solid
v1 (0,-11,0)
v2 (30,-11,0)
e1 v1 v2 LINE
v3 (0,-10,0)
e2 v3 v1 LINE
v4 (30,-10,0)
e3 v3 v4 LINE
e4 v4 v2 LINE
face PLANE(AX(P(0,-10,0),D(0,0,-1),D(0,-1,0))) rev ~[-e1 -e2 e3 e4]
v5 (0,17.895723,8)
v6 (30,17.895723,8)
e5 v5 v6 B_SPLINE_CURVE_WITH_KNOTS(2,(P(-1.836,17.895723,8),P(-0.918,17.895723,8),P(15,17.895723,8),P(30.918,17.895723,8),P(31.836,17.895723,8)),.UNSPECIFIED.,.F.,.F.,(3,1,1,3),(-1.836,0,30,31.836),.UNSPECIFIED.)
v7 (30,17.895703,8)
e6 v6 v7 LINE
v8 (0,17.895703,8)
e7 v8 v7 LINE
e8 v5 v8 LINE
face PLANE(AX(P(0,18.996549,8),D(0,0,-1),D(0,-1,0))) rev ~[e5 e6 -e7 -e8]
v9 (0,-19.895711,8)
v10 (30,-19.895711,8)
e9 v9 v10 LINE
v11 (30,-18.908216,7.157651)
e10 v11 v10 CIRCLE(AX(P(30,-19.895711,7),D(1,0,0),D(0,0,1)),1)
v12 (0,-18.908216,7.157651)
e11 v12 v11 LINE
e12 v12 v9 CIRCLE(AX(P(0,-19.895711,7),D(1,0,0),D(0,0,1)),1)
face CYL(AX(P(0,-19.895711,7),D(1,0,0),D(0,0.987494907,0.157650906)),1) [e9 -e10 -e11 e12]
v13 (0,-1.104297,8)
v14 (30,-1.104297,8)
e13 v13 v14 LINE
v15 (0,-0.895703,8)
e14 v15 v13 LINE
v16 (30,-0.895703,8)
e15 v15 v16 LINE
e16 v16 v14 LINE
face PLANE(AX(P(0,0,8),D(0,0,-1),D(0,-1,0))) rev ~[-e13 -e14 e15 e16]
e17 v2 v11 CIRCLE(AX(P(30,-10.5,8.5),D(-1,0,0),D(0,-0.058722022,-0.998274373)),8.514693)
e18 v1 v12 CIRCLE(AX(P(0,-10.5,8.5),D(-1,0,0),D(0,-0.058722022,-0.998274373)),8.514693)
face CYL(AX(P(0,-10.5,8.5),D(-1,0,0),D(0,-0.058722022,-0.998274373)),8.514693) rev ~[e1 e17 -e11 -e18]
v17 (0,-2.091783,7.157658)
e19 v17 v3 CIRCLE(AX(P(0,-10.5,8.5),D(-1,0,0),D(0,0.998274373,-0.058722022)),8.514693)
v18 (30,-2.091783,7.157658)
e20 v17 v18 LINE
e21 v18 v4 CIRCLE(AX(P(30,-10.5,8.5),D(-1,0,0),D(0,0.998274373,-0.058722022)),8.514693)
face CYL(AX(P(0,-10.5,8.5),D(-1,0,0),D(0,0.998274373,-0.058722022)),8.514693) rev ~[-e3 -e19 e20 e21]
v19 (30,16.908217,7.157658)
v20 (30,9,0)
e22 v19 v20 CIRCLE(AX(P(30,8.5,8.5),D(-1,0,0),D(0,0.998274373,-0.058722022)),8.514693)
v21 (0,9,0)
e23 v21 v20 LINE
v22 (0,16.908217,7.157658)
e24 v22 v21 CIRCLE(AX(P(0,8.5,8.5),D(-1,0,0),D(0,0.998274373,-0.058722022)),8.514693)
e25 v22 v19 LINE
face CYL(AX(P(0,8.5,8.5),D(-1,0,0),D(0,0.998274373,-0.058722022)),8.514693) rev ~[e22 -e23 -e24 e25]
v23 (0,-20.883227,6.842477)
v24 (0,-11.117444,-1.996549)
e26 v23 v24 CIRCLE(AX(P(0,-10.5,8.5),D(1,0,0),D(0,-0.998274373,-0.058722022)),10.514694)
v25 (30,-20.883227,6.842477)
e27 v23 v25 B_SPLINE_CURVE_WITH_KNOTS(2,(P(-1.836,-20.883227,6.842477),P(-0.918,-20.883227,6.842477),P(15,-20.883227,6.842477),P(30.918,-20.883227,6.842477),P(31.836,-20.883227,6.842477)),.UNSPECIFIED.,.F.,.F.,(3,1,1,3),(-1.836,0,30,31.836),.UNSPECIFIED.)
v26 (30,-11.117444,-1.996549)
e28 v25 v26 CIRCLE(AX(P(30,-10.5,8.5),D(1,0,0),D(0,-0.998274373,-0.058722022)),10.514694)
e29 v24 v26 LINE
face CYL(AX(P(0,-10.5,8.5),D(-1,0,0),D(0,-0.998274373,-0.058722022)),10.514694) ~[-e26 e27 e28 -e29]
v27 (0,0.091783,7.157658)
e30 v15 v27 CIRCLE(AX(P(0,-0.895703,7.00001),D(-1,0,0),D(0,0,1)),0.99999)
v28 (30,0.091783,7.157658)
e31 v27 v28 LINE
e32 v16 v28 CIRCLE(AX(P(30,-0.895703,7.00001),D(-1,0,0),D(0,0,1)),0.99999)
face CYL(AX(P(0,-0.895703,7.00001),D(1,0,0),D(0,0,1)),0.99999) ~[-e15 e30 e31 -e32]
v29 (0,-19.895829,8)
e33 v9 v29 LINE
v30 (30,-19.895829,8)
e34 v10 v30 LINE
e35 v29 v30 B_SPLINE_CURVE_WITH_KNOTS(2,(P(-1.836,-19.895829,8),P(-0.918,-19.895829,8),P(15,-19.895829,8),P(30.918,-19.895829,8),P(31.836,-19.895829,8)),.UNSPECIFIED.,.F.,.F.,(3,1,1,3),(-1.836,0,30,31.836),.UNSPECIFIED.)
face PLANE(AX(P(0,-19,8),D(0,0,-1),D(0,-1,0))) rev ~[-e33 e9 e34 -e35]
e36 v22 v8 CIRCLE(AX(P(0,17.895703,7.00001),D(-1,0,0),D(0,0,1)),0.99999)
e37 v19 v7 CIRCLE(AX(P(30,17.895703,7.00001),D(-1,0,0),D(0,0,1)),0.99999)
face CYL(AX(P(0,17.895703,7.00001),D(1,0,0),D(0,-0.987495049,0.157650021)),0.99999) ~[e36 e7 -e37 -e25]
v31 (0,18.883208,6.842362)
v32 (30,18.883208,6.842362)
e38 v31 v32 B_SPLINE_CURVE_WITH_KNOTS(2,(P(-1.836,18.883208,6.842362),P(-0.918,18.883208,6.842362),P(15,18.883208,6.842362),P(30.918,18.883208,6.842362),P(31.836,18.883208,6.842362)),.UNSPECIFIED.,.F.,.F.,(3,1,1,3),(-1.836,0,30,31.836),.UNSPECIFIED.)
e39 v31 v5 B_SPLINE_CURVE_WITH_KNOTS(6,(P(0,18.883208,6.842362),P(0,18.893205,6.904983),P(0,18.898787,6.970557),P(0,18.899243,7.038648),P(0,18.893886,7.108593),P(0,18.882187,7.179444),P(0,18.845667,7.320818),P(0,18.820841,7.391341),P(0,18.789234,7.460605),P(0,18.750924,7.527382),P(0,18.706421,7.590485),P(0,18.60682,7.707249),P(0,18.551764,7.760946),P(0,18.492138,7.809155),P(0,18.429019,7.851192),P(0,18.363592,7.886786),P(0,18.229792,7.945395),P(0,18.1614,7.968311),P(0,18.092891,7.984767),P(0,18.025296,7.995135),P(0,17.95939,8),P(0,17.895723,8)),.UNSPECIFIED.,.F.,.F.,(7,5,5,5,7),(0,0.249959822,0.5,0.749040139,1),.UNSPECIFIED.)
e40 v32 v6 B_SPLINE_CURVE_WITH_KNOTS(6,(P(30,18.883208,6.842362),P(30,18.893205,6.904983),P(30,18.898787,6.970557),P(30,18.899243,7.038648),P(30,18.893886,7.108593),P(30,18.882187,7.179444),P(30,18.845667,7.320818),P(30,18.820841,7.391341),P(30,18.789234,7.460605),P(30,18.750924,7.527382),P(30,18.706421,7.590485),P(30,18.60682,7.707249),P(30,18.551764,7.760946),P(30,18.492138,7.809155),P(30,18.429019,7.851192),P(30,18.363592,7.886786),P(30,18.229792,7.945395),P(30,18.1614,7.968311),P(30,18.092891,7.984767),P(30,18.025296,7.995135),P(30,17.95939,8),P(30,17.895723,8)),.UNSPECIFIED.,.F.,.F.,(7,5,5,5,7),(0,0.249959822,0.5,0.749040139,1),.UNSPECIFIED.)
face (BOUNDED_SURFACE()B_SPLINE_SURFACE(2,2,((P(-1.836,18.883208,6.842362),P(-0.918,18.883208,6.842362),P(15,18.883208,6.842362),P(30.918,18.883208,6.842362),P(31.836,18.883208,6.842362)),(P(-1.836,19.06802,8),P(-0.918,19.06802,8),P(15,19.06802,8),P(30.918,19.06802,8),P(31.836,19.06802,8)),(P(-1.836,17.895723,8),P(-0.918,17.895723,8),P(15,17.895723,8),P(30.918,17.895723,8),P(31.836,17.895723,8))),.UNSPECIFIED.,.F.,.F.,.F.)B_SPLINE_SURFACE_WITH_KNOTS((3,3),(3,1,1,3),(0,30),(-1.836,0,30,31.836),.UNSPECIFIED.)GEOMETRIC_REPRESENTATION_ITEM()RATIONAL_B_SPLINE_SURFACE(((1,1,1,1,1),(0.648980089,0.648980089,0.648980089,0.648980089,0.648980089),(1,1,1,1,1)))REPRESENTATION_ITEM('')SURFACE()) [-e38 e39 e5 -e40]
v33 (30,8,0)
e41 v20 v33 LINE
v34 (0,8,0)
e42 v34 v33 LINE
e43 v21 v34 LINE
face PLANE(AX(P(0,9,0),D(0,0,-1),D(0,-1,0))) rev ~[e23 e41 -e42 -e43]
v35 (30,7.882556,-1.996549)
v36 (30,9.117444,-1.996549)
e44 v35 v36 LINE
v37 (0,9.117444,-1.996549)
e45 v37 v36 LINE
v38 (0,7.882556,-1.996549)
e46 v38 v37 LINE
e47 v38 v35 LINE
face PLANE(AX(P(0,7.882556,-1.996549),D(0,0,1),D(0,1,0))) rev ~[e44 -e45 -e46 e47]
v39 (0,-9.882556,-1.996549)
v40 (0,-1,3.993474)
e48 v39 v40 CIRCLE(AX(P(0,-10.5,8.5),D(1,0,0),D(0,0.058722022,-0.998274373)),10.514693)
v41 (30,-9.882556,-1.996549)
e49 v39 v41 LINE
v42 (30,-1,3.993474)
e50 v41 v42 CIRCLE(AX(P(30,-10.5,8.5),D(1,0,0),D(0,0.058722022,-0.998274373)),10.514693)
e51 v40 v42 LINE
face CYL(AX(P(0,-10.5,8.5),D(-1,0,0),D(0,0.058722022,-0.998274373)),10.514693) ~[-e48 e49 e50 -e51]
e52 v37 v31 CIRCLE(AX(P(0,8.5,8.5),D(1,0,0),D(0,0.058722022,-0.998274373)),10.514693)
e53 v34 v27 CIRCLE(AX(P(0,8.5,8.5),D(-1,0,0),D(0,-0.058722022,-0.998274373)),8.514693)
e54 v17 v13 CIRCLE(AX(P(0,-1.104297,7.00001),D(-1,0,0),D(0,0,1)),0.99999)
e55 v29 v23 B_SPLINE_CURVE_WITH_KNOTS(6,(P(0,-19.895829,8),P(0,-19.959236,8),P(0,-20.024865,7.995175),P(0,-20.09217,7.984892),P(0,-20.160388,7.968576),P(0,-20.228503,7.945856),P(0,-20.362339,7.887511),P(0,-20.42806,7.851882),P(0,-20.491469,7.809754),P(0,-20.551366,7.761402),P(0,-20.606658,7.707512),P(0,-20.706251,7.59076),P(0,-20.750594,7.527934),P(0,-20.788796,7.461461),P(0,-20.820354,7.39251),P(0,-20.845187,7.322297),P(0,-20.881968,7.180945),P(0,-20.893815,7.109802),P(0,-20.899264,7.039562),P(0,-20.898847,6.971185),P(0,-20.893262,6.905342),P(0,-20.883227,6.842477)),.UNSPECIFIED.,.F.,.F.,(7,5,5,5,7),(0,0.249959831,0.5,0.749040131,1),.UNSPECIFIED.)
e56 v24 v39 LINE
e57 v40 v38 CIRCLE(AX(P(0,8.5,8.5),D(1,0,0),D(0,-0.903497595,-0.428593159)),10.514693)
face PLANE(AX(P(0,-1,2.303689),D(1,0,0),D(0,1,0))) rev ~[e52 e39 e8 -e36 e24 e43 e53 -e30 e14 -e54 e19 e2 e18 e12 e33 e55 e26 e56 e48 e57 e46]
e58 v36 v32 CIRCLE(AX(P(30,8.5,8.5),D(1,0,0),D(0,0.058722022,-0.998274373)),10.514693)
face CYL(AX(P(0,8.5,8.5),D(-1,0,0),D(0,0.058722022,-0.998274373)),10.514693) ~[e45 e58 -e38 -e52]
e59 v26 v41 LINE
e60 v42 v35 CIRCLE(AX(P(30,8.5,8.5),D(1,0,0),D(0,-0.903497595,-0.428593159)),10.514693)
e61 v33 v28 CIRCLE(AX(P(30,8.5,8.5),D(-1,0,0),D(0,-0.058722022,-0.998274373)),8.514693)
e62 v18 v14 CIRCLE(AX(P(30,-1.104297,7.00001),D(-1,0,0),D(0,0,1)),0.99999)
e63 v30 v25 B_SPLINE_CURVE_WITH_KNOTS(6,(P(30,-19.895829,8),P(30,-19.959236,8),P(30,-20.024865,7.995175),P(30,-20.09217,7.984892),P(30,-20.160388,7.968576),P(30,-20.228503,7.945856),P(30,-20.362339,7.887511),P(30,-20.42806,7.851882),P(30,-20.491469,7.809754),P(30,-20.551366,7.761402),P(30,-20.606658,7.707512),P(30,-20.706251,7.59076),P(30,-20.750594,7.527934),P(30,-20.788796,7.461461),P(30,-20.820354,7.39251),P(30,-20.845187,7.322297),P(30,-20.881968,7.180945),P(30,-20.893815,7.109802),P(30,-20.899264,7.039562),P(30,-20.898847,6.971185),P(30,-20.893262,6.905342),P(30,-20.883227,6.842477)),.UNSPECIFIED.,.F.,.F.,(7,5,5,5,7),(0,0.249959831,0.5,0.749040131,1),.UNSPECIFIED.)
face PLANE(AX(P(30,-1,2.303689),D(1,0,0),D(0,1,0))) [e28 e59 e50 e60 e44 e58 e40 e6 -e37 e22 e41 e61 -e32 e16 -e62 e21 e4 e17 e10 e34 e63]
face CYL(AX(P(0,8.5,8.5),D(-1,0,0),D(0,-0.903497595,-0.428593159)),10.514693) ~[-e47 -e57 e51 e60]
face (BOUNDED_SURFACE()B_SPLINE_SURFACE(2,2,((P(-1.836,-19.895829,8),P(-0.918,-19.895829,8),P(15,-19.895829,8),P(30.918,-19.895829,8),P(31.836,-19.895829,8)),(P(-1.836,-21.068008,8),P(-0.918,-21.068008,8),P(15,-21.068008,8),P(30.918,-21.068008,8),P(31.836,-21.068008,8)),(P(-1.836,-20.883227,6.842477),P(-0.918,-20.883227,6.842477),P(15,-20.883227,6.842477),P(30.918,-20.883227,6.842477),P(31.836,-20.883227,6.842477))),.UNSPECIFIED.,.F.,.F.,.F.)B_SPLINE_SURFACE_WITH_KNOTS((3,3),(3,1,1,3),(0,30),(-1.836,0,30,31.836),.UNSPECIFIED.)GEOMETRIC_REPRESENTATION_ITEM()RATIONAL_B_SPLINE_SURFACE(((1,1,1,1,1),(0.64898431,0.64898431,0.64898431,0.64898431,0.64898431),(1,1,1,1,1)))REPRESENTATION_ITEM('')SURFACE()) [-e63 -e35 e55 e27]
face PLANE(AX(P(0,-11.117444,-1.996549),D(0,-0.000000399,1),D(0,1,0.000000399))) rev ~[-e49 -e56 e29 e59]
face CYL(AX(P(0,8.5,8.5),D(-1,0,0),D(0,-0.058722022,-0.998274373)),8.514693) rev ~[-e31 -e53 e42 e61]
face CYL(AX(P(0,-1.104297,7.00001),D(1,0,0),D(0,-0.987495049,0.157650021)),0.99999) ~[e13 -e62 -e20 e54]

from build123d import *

# Parameters (mm, degrees)
F1_DEPTH = 30
F2_R     = 1
F3_R     = 0.9999
F4_R     = 0.99999


# Not quite as in the source:
# - a fillet or chamfer is up to 0.001 mm smaller than in the source, because OpenCascade refuses the exact size


with BuildPart() as f1:
    # F0 (on Right) → F1 (new body)
    with BuildSketch(Plane.YZ):
        with BuildLine():
            Line((0, 8), (-1, 8))
            Line((-1, 8), (-2, 8))
            ThreePointArc((-2, 8), (-4.4792027106, 2.4792027106), (-10, 0))
            Line((-10, 0), (-11, 0))
            ThreePointArc((-11, 0), (-16.5207972894, 2.4792027106), (-19, 8))
            Line((-19, 8), (-20.9965492395, 8))
            Line((-20.9965492395, 8), (-20.9965492395, 7.8825559271))
            ThreePointArc((-20.9965492395, 7.8825559271), (-17.9350112011, 1.0649887989), (-11.1174440729, -1.9965492395))
            Line((-11.1174440729, -1.9965492395), (-9.8825559561, -1.9965487463))
            ThreePointArc((-9.8825559561, -1.9965487463), (-4.6211597315, -0.2176837422), (-1, 3.9934744279))
            ThreePointArc((-1, 3.9934744279), (2.6211597315, -0.2176837422), (7.8825559561, -1.9965487463))
            Line((7.8825559561, -1.9965487463), (9.1174440439, -1.9965487463))
            ThreePointArc((9.1174440439, -1.9965487463), (15.9350108518, 1.0649891482), (18.9965487463, 7.8825559561))
            Line((18.9965487463, 7.8825559561), (18.9965487463, 8))
            Line((18.9965487463, 8), (17, 8))
            ThreePointArc((17, 8), (14.5207972894, 2.4792027106), (9, 0))
            Line((9, 0), (8, 0))
            ThreePointArc((8, 0), (2.4792027106, 2.4792027106), (0, 8))
        make_face()
    extrude(amount=F1_DEPTH)

    # F2
    f2_edges = [f1.edges().sort_by_distance(p)[0] for p in [
        (15, -19, 8),
    ]]
    fillet(f2_edges, radius=F2_R)

    # F3 (radius 1 in the source; OpenCascade refuses exactly that, so slightly less here)
    f3_edges = [f1.edges().sort_by_distance(p)[0] for p in [
        (15, -20.996549, 8),
    ]]
    fillet(f3_edges, radius=F3_R)

    # F4 (radius 1 in the source; OpenCascade refuses exactly that, so slightly less here)
    f4_edges = [f1.edges().sort_by_distance(p)[0] for p in [
        (15, -2, 8),
        (15, 0, 8),
        (15, 18.996549, 8),
        (15, 17, 8),
    ]]
    fillet(f4_edges, radius=F4_R)


solid = f1.part
